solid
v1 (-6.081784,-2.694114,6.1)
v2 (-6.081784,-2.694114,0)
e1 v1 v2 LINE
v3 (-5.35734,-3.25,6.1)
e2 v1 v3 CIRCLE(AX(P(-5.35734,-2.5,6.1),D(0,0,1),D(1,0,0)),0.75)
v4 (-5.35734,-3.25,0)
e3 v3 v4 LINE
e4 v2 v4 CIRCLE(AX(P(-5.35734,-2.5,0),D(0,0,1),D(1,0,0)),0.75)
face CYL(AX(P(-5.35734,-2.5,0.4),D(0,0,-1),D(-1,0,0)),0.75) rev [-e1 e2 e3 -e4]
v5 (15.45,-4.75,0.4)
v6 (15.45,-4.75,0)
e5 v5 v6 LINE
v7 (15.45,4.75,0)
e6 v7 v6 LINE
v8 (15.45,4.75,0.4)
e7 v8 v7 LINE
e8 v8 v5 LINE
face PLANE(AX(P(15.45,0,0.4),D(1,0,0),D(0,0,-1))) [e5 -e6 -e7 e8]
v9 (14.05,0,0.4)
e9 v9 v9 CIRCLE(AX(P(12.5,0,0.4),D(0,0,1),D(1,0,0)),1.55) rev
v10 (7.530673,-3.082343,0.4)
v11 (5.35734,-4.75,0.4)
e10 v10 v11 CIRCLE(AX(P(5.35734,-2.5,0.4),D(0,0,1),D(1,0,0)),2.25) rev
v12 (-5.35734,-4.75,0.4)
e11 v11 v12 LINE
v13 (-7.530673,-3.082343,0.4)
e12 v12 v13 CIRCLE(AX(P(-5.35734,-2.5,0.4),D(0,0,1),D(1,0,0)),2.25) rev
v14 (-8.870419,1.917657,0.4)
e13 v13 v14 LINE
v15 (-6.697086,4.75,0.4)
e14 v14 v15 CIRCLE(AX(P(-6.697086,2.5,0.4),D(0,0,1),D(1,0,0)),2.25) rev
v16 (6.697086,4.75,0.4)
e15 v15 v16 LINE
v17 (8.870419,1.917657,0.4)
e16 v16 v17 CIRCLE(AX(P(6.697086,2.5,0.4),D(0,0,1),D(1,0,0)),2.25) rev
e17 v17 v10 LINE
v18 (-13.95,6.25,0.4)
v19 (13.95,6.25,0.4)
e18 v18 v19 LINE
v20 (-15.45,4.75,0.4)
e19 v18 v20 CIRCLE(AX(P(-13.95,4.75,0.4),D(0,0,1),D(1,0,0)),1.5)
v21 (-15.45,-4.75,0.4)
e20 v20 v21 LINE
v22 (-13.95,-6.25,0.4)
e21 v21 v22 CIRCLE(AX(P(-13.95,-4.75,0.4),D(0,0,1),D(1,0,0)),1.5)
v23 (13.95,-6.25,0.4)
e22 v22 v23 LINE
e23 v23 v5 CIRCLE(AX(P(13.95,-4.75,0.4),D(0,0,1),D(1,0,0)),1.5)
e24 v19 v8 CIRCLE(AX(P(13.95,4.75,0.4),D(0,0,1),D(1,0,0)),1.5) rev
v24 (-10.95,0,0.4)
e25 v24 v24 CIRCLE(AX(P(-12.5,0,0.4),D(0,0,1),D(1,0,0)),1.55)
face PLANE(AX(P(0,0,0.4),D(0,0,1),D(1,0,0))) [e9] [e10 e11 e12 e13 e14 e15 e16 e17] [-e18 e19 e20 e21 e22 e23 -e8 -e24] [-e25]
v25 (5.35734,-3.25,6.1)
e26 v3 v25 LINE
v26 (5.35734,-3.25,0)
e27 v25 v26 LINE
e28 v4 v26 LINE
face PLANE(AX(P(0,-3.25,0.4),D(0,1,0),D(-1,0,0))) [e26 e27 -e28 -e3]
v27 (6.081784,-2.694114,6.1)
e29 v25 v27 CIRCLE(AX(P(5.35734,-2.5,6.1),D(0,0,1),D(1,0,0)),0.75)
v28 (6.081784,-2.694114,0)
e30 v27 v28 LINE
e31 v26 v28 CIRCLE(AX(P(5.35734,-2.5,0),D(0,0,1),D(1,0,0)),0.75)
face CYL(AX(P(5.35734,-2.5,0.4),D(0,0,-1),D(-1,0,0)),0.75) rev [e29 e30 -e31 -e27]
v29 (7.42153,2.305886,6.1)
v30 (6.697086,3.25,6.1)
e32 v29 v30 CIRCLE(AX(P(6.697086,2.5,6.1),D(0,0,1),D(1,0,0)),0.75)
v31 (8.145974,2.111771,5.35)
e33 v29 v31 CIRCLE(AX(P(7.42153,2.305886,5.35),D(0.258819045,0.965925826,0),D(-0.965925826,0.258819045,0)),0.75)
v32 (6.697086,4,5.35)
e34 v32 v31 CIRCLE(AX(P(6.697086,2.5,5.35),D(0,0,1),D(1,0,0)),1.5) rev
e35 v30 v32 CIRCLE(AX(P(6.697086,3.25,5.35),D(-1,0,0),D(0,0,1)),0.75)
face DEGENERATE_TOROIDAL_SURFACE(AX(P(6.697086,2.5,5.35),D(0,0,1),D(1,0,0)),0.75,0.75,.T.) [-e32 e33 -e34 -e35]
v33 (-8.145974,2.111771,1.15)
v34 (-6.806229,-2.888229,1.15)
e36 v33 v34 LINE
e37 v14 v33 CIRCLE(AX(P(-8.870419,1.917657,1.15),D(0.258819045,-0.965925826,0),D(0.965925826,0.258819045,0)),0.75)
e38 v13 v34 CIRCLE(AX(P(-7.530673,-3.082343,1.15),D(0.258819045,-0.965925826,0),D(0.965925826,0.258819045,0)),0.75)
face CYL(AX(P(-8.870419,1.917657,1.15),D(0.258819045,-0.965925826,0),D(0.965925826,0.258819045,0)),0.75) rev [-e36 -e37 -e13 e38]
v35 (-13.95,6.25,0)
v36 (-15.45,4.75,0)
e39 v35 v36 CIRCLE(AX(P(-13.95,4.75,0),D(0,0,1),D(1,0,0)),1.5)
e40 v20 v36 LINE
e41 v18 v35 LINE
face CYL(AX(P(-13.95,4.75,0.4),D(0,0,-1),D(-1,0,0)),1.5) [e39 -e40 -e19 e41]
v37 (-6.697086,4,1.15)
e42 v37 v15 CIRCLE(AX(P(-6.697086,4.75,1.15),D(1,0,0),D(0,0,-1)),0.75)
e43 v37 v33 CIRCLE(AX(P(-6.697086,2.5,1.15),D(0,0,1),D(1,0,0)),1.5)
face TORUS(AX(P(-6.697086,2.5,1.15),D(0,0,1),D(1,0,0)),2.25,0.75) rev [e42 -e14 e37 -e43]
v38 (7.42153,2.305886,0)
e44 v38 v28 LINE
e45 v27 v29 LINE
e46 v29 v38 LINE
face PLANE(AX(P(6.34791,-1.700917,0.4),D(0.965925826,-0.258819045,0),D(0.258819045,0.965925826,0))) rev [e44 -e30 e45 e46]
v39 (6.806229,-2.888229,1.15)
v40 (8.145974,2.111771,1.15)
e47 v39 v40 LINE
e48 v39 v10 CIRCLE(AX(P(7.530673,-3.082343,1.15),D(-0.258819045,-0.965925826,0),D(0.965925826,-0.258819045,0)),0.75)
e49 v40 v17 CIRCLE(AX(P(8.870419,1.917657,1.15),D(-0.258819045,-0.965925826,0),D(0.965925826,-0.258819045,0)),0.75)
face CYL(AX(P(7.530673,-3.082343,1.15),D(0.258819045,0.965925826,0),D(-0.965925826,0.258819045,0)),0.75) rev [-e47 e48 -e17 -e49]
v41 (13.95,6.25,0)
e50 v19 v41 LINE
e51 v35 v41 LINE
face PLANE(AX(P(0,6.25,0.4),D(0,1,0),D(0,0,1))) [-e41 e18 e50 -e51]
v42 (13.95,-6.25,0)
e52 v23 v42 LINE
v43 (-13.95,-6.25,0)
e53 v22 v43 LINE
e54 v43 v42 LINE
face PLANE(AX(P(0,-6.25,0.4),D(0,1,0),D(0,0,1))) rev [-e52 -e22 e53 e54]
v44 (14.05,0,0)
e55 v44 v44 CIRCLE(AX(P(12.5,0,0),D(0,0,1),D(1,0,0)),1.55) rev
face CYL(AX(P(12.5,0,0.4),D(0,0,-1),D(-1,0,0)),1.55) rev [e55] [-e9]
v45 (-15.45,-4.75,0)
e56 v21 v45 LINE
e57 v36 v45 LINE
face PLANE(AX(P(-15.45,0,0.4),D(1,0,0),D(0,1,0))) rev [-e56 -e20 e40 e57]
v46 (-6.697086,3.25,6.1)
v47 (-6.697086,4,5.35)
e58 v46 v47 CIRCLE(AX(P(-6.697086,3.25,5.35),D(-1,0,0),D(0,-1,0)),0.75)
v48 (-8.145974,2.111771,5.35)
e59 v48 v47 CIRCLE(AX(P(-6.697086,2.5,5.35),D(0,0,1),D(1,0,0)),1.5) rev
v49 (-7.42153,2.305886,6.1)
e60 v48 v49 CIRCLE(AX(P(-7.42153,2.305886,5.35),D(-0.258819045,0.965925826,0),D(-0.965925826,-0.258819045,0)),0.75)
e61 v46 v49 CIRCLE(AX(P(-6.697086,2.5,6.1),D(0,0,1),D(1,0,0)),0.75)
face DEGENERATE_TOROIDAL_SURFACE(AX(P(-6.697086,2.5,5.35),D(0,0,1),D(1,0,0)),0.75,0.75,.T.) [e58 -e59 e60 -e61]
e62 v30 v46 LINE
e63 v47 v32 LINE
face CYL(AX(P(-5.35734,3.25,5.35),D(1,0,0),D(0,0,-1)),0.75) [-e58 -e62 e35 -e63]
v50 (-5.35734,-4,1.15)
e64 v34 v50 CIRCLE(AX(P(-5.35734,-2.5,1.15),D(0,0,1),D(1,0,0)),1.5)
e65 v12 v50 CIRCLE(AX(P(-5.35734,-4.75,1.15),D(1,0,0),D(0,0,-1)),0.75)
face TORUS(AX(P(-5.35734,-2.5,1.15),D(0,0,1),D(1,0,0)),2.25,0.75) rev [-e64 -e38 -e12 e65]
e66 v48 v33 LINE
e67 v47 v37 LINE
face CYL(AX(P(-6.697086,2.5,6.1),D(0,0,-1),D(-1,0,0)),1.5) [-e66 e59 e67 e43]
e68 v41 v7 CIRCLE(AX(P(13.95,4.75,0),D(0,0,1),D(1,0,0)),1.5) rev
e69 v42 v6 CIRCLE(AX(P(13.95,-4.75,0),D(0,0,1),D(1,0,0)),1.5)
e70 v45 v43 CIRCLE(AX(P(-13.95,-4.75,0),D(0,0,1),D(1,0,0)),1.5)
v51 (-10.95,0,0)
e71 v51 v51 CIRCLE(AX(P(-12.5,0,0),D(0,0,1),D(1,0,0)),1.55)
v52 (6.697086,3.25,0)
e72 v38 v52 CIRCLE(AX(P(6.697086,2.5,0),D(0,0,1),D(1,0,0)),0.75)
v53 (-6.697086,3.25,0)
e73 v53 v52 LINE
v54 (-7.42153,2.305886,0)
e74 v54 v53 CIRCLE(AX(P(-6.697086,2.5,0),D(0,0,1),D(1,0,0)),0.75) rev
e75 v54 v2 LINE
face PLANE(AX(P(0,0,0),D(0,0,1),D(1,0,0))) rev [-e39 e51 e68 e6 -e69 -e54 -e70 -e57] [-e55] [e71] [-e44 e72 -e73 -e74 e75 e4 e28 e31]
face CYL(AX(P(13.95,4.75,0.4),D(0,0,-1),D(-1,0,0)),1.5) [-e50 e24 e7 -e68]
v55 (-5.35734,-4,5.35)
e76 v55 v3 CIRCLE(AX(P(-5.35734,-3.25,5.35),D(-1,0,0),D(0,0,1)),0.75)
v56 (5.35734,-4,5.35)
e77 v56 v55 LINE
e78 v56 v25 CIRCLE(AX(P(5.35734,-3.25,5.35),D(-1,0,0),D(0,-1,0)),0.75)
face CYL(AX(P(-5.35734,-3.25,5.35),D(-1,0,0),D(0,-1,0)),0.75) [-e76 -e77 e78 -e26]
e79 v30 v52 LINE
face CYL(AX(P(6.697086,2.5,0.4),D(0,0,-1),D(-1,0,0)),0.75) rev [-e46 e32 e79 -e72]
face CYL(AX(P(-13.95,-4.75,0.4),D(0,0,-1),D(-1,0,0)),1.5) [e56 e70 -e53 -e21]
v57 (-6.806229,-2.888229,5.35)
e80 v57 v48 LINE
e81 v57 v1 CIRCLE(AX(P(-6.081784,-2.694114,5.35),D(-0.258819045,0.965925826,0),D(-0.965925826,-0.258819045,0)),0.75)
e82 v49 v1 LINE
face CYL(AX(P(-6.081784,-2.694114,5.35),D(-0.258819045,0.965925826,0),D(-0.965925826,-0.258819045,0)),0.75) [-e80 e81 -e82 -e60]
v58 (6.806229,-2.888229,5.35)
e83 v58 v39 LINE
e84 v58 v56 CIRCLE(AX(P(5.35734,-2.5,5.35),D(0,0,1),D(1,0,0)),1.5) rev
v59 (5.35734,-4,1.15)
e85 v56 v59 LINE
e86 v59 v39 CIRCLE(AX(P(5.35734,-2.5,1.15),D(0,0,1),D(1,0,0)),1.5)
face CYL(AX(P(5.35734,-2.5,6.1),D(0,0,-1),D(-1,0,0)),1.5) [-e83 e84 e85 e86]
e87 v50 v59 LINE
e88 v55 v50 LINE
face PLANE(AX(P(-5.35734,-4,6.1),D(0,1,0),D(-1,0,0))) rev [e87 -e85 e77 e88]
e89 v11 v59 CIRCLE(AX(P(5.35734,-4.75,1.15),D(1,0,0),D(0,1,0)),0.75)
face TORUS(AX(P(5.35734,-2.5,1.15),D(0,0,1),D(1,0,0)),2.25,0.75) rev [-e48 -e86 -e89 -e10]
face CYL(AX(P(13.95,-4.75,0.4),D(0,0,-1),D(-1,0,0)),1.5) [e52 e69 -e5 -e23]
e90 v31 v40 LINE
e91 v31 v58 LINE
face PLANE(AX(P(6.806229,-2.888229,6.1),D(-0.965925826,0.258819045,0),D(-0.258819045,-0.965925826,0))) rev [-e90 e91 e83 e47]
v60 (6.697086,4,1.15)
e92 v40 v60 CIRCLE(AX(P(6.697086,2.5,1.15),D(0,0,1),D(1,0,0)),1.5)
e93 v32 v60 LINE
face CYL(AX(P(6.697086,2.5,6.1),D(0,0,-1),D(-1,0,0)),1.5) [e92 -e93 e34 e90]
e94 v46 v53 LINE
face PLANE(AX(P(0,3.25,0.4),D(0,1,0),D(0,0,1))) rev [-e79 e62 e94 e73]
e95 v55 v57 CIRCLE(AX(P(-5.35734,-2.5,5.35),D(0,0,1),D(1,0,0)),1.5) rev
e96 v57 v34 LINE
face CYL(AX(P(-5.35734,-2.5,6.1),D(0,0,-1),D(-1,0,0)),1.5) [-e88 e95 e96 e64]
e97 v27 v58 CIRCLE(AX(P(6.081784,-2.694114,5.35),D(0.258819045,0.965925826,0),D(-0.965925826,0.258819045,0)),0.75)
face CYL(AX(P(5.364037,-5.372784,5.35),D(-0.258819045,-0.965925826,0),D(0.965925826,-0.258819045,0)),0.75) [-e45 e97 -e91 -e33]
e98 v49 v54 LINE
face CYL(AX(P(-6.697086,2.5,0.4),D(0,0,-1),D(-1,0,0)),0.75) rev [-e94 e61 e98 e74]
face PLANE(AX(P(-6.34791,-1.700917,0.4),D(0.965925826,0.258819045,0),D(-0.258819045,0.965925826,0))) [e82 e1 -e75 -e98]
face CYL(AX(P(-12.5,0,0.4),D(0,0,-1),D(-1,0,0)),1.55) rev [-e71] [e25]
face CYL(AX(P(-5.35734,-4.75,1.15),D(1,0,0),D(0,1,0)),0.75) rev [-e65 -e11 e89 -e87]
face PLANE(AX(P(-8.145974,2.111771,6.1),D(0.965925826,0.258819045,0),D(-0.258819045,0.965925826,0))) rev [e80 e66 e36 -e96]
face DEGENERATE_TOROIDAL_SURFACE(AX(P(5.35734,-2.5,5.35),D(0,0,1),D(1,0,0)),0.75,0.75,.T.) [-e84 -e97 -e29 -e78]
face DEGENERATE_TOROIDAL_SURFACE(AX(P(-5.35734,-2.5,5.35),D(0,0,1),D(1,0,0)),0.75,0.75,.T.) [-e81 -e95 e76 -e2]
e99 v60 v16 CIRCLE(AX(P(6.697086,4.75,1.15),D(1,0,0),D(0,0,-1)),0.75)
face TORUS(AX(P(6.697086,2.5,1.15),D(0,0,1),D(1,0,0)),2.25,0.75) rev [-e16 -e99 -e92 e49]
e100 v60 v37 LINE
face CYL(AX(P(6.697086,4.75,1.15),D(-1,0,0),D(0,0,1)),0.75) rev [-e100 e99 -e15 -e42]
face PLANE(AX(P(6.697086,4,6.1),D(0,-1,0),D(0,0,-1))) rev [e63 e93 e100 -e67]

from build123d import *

# Parameters (mm, degrees)
SKETCH1_R           = 1.55
BOSS_EXTRUDE1_DEPTH = 0.4
BOSS_EXTRUDE2_DEPTH = 5.7
FILLET1_R           = 0.75


with BuildPart() as part:
    # Sketch1 → Boss-Extrude1 (new body)
    with BuildSketch(Plane.XY):
        with BuildLine():
            Line((-13.95, 6.25), (13.95, 6.25))
            ThreePointArc((13.95, 6.25), (15.010660172, 5.810660172), (15.45, 4.75))
            Line((15.45, 4.75), (15.45, -4.75))
            ThreePointArc((15.45, -4.75), (15.010660172, -5.810660172), (13.95, -6.25))
            Line((13.95, -6.25), (-13.95, -6.25))
            ThreePointArc((-13.95, -6.25), (-15.010660172, -5.810660172), (-15.45, -4.75))
            Line((-15.45, -4.75), (-15.45, 4.75))
            ThreePointArc((-15.45, 4.75), (-15.010660172, 5.810660172), (-13.95, 6.25))
        make_face()
        with Locations((-12.5, 0)):
            Circle(SKETCH1_R, mode=Mode.SUBTRACT)
        with Locations((12.5, 0)):
            Circle(SKETCH1_R, mode=Mode.SUBTRACT)
        with BuildLine():
            Line((-6.697085729, 3.25), (6.697085729, 3.25))
            ThreePointArc((6.697085729, 3.25), (7.292100735, 2.956571072), (7.421530099, 2.305885716))
            Line((7.421530099, 2.305885716), (6.081784137, -2.694114284))
            ThreePointArc((6.081784137, -2.694114284), (5.813910839, -3.095015005), (5.357339767, -3.25))
            Line((5.357339767, -3.25), (-5.357339767, -3.25))
            ThreePointArc((-5.357339767, -3.25), (-5.813910839, -3.095015005), (-6.081784137, -2.694114284))
            Line((-6.081784137, -2.694114284), (-7.421530099, 2.305885716))
            ThreePointArc((-7.421530099, 2.305885716), (-7.292100735, 2.956571072), (-6.697085729, 3.25))
        make_face(mode=Mode.SUBTRACT)
    extrude(amount=BOSS_EXTRUDE1_DEPTH)

    # Sketch2 → Boss-Extrude2 (add)
    with BuildSketch(Plane.XY.offset(0.4)):
        with BuildLine():
            Line((6.697085729, 4), (-6.697085729, 4))
            ThreePointArc((-6.697085729, 4), (-7.88711574, 3.413142144), (-8.145974469, 2.111771432))
            Line((-8.145974469, 2.111771432), (-6.806228507, -2.888228568))
            ThreePointArc((-6.806228507, -2.888228568), (-6.270481911, -3.69003001), (-5.357339767, -4))
            Line((-5.357339767, -4), (5.357339767, -4))
            ThreePointArc((5.357339767, -4), (6.270481911, -3.69003001), (6.806228507, -2.888228568))
            Line((6.806228507, -2.888228568), (8.145974469, 2.111771432))
            ThreePointArc((8.145974469, 2.111771432), (7.88711574, 3.413142144), (6.697085729, 4))
        make_face()
        with BuildLine():
            Line((-7.421530099, 2.305885716), (-6.081784137, -2.694114284))
            ThreePointArc((-6.081784137, -2.694114284), (-5.813910839, -3.095015005), (-5.357339767, -3.25))
            Line((-5.357339767, -3.25), (5.357339767, -3.25))
            ThreePointArc((5.357339767, -3.25), (5.813910839, -3.095015005), (6.081784137, -2.694114284))
            Line((6.081784137, -2.694114284), (7.421530099, 2.305885716))
            ThreePointArc((7.421530099, 2.305885716), (7.292100735, 2.956571072), (6.697085729, 3.25))
            Line((6.697085729, 3.25), (-6.697085729, 3.25))
            ThreePointArc((-6.697085729, 3.25), (-7.292100735, 2.956571072), (-7.421530099, 2.305885716))
        make_face(mode=Mode.SUBTRACT)
    extrude(amount=BOSS_EXTRUDE2_DEPTH)

    # Fillet1
    fillet1_edges = [part.edges().sort_by_distance(p)[0] for p in [
        (-6.270481911, -3.69003001, 6.1),
        (0, -4, 6.1),
        (6.270481911, -3.69003001, 6.1),
        (7.476101488, -0.388228568, 6.1),
        (7.88711574, 3.413142144, 6.1),
        (0, 4, 6.1),
        (-7.88711574, 3.413142144, 6.1),
        (-7.476101488, -0.388228568, 6.1),
        (-6.270481911, -3.69003001, 0.4),
        (0, -4, 0.4),
        (6.270481911, -3.69003001, 0.4),
        (7.476101488, -0.388228568, 0.4),
        (7.88711574, 3.413142144, 0.4),
        (0, 4, 0.4),
        (-7.88711574, 3.413142144, 0.4),
        (-7.476101488, -0.388228568, 0.4),
    ]]
    fillet(fillet1_edges, radius=FILLET1_R - 0.0001)  # a hair under: the kernel refuses the full size


solid = part.part
